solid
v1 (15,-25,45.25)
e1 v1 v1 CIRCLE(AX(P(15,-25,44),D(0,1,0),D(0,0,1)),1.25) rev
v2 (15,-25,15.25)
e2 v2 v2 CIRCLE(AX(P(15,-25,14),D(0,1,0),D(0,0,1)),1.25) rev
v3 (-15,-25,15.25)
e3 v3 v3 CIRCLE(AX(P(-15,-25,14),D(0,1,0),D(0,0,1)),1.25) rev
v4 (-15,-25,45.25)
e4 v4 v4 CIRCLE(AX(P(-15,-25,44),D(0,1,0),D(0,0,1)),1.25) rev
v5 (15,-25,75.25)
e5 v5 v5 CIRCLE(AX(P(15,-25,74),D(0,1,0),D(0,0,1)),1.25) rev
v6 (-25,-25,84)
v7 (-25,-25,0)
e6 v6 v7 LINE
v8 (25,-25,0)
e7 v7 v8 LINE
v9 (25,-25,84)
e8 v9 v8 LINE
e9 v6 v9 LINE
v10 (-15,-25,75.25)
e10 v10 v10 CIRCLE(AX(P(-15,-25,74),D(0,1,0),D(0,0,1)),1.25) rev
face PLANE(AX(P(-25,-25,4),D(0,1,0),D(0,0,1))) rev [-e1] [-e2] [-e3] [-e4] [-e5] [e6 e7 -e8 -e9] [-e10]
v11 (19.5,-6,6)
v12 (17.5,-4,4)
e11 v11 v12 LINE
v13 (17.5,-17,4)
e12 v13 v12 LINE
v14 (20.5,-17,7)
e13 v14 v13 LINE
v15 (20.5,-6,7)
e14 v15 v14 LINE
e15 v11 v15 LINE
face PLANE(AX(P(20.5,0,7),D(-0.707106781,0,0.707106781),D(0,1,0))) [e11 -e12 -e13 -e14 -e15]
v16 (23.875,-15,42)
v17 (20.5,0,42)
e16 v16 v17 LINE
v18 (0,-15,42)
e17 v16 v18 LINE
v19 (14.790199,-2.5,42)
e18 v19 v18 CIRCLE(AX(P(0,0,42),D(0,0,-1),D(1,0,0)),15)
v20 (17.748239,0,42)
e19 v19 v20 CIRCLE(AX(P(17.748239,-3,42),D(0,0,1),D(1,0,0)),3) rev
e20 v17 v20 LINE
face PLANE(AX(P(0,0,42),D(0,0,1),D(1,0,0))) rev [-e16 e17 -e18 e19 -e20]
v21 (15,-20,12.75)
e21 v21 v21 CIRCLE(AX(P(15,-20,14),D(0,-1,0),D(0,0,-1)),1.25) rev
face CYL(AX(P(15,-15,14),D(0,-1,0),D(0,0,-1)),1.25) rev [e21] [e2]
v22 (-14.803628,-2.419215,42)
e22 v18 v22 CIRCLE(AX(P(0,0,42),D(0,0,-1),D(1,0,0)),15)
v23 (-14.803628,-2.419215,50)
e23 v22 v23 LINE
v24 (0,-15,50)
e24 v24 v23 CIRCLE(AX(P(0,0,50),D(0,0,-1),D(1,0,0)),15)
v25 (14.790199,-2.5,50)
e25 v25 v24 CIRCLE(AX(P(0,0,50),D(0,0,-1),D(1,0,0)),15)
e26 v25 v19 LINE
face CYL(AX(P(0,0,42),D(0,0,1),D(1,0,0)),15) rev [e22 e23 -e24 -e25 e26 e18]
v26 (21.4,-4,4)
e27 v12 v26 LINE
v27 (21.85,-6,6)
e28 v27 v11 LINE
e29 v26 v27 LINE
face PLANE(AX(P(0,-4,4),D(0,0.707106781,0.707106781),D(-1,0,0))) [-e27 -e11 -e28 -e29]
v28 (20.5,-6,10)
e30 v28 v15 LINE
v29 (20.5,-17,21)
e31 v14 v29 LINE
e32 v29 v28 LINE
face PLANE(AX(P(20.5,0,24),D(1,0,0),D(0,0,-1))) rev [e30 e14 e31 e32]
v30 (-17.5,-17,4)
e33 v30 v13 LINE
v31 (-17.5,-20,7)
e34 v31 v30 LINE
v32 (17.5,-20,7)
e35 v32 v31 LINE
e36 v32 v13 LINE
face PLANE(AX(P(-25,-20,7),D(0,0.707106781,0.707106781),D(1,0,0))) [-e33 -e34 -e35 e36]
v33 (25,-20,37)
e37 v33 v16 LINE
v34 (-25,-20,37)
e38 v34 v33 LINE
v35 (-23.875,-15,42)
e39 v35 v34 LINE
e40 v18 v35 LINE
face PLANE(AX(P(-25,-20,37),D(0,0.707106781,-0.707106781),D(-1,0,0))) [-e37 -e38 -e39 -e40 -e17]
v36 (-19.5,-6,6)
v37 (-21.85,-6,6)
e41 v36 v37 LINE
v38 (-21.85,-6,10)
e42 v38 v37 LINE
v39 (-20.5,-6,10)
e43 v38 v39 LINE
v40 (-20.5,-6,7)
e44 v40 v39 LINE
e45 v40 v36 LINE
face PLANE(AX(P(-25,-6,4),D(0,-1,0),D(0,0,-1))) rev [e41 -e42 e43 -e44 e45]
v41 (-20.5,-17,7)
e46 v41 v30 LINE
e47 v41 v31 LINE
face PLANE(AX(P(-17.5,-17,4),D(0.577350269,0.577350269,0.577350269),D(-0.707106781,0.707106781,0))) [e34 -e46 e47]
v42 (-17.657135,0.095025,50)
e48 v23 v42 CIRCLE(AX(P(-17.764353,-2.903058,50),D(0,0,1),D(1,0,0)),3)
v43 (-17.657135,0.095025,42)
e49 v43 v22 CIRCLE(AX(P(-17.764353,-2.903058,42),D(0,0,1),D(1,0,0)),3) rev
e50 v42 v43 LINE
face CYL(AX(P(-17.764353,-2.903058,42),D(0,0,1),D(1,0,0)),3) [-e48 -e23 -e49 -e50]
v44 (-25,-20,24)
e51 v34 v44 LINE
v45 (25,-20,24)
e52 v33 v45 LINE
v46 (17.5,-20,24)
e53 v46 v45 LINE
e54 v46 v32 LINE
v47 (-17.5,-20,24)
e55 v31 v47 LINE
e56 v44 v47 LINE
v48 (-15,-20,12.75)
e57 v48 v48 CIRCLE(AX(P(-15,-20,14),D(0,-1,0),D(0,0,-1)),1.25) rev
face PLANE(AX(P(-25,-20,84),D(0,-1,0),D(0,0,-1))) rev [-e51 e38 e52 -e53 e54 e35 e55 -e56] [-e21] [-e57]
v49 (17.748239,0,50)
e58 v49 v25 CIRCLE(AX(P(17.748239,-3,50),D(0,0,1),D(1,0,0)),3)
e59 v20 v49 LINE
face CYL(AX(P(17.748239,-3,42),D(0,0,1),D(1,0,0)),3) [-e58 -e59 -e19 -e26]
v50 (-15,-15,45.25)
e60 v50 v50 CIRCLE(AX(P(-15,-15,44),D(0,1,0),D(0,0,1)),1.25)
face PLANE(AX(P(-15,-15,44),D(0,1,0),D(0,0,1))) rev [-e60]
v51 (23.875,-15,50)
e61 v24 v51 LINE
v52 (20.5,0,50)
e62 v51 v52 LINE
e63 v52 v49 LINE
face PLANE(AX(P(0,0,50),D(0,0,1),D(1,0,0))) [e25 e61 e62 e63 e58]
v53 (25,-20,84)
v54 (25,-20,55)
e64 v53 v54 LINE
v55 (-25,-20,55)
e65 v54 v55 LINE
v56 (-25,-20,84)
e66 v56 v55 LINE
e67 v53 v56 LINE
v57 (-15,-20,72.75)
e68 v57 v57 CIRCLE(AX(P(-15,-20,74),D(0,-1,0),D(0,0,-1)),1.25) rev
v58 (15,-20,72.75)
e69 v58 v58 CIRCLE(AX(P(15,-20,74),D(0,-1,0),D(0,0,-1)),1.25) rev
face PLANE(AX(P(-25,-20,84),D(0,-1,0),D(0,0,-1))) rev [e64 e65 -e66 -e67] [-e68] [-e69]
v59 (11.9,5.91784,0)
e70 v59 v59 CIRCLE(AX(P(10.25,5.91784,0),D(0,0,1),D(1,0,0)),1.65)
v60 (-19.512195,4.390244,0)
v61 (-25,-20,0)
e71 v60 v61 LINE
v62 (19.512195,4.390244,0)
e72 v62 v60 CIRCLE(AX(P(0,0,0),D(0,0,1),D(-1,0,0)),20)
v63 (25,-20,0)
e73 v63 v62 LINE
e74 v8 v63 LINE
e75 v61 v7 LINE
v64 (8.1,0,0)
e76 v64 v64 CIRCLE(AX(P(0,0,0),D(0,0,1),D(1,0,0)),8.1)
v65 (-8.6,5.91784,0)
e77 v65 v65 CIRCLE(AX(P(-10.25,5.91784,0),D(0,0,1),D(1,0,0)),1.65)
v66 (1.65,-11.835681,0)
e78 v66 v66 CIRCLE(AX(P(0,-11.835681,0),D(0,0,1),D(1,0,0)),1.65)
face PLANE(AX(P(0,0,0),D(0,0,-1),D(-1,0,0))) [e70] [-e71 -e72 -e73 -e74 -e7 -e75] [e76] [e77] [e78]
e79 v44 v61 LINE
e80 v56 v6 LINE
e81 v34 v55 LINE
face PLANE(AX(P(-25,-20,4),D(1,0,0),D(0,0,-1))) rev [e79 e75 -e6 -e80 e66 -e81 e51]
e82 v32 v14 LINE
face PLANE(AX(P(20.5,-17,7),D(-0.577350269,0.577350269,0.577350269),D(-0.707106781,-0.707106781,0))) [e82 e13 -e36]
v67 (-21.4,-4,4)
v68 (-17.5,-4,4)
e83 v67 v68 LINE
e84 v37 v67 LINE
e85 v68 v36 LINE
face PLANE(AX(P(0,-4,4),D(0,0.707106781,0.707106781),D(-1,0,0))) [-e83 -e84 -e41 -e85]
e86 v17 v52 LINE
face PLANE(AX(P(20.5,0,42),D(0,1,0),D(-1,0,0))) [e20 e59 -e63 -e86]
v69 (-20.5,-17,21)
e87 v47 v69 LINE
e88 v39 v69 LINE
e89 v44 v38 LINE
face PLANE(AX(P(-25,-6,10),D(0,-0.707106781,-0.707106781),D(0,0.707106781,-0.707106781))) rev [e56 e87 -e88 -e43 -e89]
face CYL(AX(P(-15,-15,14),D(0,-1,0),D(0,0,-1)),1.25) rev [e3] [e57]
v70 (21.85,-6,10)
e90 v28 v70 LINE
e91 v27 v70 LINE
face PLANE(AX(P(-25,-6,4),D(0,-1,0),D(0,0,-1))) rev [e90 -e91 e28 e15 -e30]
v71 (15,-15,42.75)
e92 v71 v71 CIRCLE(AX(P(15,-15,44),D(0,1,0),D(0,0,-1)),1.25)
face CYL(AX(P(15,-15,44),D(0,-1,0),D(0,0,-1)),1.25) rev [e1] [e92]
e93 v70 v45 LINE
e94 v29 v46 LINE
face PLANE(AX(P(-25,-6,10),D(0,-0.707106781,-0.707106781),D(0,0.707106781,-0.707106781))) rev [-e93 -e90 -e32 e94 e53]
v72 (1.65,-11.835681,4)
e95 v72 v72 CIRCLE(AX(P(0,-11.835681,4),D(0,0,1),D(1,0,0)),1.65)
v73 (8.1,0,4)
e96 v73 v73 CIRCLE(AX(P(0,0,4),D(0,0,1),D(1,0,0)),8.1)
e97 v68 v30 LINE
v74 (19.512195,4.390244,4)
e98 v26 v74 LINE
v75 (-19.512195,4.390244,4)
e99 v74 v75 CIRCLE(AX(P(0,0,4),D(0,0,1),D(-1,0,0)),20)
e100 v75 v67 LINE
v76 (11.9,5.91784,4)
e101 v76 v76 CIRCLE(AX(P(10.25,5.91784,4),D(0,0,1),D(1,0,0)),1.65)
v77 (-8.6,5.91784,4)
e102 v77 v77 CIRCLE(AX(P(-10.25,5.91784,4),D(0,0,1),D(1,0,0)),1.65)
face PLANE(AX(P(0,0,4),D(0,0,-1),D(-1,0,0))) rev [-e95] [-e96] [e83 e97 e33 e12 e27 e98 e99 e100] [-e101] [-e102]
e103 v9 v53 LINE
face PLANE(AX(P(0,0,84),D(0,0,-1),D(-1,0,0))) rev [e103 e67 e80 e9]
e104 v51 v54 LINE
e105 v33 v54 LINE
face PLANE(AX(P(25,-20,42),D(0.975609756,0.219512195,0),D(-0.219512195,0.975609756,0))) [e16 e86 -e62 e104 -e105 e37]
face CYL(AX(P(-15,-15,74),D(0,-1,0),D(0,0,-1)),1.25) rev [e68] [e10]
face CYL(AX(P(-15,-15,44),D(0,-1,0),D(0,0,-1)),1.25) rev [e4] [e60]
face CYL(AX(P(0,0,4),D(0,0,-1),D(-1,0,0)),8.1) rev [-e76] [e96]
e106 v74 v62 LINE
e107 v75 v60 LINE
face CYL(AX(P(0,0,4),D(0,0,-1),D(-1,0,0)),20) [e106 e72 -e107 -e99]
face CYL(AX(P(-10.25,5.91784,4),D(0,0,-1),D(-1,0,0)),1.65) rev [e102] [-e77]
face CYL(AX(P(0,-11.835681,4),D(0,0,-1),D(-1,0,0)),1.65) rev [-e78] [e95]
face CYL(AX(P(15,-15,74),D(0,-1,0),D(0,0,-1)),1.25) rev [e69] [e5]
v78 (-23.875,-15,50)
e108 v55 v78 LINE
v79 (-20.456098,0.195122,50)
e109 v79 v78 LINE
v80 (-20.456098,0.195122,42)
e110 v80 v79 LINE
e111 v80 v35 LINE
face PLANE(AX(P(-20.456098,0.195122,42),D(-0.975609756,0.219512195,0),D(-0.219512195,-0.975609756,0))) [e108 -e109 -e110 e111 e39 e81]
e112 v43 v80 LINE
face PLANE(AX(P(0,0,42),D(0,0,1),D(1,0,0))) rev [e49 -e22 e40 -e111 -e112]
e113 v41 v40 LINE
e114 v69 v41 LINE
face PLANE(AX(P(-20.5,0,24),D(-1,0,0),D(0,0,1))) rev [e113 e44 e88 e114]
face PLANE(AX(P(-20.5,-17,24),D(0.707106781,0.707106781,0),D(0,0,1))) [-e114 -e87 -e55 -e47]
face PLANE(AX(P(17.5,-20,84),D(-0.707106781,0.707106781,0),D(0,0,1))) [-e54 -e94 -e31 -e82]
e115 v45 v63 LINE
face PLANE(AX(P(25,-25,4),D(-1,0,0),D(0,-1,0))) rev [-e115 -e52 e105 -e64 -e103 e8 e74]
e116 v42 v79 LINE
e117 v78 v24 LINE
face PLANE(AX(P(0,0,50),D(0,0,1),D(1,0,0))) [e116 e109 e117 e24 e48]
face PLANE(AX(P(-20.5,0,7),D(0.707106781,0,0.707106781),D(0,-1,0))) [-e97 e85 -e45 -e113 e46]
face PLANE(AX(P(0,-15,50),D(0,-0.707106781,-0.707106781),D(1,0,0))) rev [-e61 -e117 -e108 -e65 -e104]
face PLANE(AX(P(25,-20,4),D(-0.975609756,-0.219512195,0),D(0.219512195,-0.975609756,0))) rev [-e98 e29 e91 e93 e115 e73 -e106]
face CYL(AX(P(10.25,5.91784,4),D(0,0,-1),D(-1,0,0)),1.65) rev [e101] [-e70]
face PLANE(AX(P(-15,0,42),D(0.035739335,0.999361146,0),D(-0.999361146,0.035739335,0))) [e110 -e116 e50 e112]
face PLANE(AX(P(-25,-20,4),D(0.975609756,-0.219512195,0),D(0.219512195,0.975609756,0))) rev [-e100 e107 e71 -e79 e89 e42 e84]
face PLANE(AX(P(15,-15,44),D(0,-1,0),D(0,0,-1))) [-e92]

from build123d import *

# Parameters (mm, degrees)
ESQUISSE1_R                  = 8.1
ESQUISSE1_R_2                = 1.65
BOSS_EXTRU_1_DEPTH           = 4
ESQUISSE2_W                  = 50
ESQUISSE2_H                  = 5
BOSS_EXTRU_2_DEPTH           = 80
BOSS_EXTRU_3_DEPTH           = 20
ENL_V_MAT_EXTRU_2_DEPTH      = 99.748417709
ENL_V_MAT_EXTRU_2_DEPTH_BACK = 99.748417709
CHANFREIN1_SIZE              = 3
CHANFREIN2_SIZE              = 2
BOSS_EXTRU_4_DEPTH           = 4
BOSS_EXTRU_4_DEPTH_BACK      = 4
CHANFREIN3_SIZE              = 5
ENL_V_MAT_EXTRU_3_DEPTH      = 5
ENL_V_MAT_EXTRU_3_DEPTH_BACK = 20
ESQUISSE6_R                  = 1.25
CONG_1_R                     = 3


with BuildPart() as part:
    # Esquisse1 → Boss.-Extru.1 (new body)
    with BuildSketch(Plane.XY):
        with BuildLine():
            Line((-25, -20), (-25, -25))
            Line((-25, -25), (25, -25))
            Line((25, -25), (25, -20))
            Line((25, -20), (19.512195122, 4.390243902))
            ThreePointArc((19.512195122, 4.390243902), (0, 20), (-19.512195122, 4.390243902))
            Line((-19.512195122, 4.390243902), (-25, -20))
        make_face()
        Circle(ESQUISSE1_R, mode=Mode.SUBTRACT)
        with Locations((-10.25, 5.917840259)):
            Circle(ESQUISSE1_R_2, mode=Mode.SUBTRACT)
        with Locations((10.25, 5.917840259)):
            Circle(ESQUISSE1_R_2, mode=Mode.SUBTRACT)
        with Locations((0, -11.835680518)):
            Circle(ESQUISSE1_R_2, mode=Mode.SUBTRACT)
    extrude(amount=BOSS_EXTRU_1_DEPTH)

    # Esquisse2 → Boss.-Extru.2 (add)
    with BuildSketch(Plane.XY.offset(4)):
        with Locations((0, -22.5)):
            Rectangle(ESQUISSE2_W, ESQUISSE2_H)
    extrude(amount=BOSS_EXTRU_2_DEPTH)

    # Esquisse4 → Boss.-Extru.3 (add)
    with BuildSketch(Plane.XY.offset(4)):
        Polygon((-20.5, 0), (-20.5, -20), (-25, -20), align=None)
        Polygon((20.5, -20), (25, -20), (20.5, 0), align=None)
    extrude(amount=BOSS_EXTRU_3_DEPTH)

    # Esquisse5 → Enlèv. mat.-Extru.2 (cut, two sides: drawn at the far end of the back side and taken through both)
    with BuildSketch(Plane(origin=(-20.5, 0, 0), x_dir=(0, 0, -1), z_dir=(1, 0, 0)).offset(-ENL_V_MAT_EXTRU_2_DEPTH_BACK)):
        Polygon((-4, 0), (-24, 0), (-24, -20), (-10, -6), (-4, -6), align=None)
    extrude(amount=ENL_V_MAT_EXTRU_2_DEPTH + ENL_V_MAT_EXTRU_2_DEPTH_BACK, mode=Mode.SUBTRACT)

    # Chanfrein1
    chanfrein1_edges = [part.edges().sort_by_distance(p)[0] for p in [
        (-20.5, -13, 4),
        (-20.5, -20, 14),
        (0, -20, 4),
        (20.5, -20, 14),
        (20.5, -13, 4),
    ]]
    chamfer(chanfrein1_edges, length=CHANFREIN1_SIZE)

    # Chanfrein2
    chanfrein2_edges = [part.edges().sort_by_distance(p)[0] for p in [
        (-19.675, -6, 4),
        (19.675, -6, 4),
    ]]
    chamfer(chanfrein2_edges, length=CHANFREIN2_SIZE)

    # Esquisse7 → Boss.-Extru.4 (add, two sides: drawn at the far end of the back side and taken through both)
    with BuildSketch(Plane.XY.offset(46).offset(-BOSS_EXTRU_4_DEPTH_BACK)):
        with BuildLine():
            Line((-15, 0), (-20.456097561, 0.195121951))
            Line((-20.456097561, 0.195121951), (-25, -20))
            Line((-25, -20), (25, -20))
            Line((25, -20), (20.5, 0))
            Line((20.5, 0), (15, 0))
            ThreePointArc((15, 0), (0, -15), (-15, 0))
        make_face()
    extrude(amount=BOSS_EXTRU_4_DEPTH + BOSS_EXTRU_4_DEPTH_BACK)

    # Chanfrein3
    # the kernel refuses this chamfer: 5 mm, written as the material it adds along each edge
    with BuildSketch(Plane(origin=(-25, -20, 42), x_dir=(0, -0.027495876610586317, -0.9996219169112968), z_dir=(1, 0, 0))) as chanfrein3_piece_1_section:
        Polygon((CHANFREIN3_SIZE * 0.999621916911, CHANFREIN3_SIZE * 0.0274958766106), (-CHANFREIN3_SIZE * 0.0274958766106, CHANFREIN3_SIZE * 0.999621916911), (0, 0), align=None)
    chanfrein3_piece_1 = extrude(amount=50, mode=Mode.PRIVATE)
    chanfrein3_piece_1 = split(chanfrein3_piece_1, bisect_by=Plane(origin=(23.445378938, -13.090573058, 40.343175913), z_dir=(-0.9756097560975611, -0.2195121951219509, 0)), keep=Keep.TOP, mode=Mode.PRIVATE)
    chanfrein3_piece_1 = split(chanfrein3_piece_1, bisect_by=Plane(origin=(-23.445378938, -13.090573058, 40.343175913), z_dir=(0.9756097560975611, -0.21951219512195103, 0)), keep=Keep.TOP, mode=Mode.PRIVATE)
    chanfrein3_piece_1 = chanfrein3_piece_1 - Plane(origin=(0, 0, 40.343175913), x_dir=(1, 0, 0), z_dir=(0, 0, -1)) * Cylinder(15, 120, mode=Mode.PRIVATE)
    add(chanfrein3_piece_1)
    with BuildSketch(Plane(origin=(-25, -20, 50), x_dir=(0, -0.027495876610586317, 0.9996219169112968), z_dir=(1, 0, 0))) as chanfrein3_piece_2_section:
        Polygon((CHANFREIN3_SIZE * 0.999621916911, -CHANFREIN3_SIZE * 0.0274958766106), (-CHANFREIN3_SIZE * 0.0274958766106, -CHANFREIN3_SIZE * 0.999621916911), (0, 0), align=None)
    chanfrein3_piece_2 = extrude(amount=50, mode=Mode.PRIVATE)
    chanfrein3_piece_2 = split(chanfrein3_piece_2, bisect_by=Plane(origin=(23.445378938, -13.090573058, 51.656824087), z_dir=(-0.9756097560975611, -0.2195121951219509, 0)), keep=Keep.TOP, mode=Mode.PRIVATE)
    chanfrein3_piece_2 = split(chanfrein3_piece_2, bisect_by=Plane(origin=(-23.445378938, -13.090573058, 51.656824087), z_dir=(0.9756097560975611, -0.21951219512195103, 0)), keep=Keep.TOP, mode=Mode.PRIVATE)
    chanfrein3_piece_2 = chanfrein3_piece_2 - Plane(origin=(0, 0, 51.656824087), x_dir=(1, 0, 0), z_dir=(0, 0, -1)) * Cylinder(15, 120, mode=Mode.PRIVATE)
    add(chanfrein3_piece_2)

    # Esquisse6 → Enlèv. mat.-Extru.3 (cut, two sides: drawn at the far end of the back side and taken through both)
    with BuildSketch(Plane(origin=(0, -20, 0), x_dir=(1, 0, 0), z_dir=(0, 1, 0)).offset(-ENL_V_MAT_EXTRU_3_DEPTH_BACK)):
        with Locations(Location((-15, -74, 0), (0, 0, 90))):
            Circle(ESQUISSE6_R)
        with Locations(Location((15, -74, 0), (0, 0, 90))):
            Circle(ESQUISSE6_R)
        with Locations(Location((15, -14, 0), (0, 0, 90))):
            Circle(ESQUISSE6_R)
        with Locations(Location((-15, -14, 0), (0, 0, 90))):
            Circle(ESQUISSE6_R)
        with Locations(Location((-15, -44, 0), (0, 0, 270))):
            Circle(ESQUISSE6_R)
        with Locations(Location((15, -44, 0), (0, 0, 90))):
            Circle(ESQUISSE6_R)
    extrude(amount=ENL_V_MAT_EXTRU_3_DEPTH + ENL_V_MAT_EXTRU_3_DEPTH_BACK, mode=Mode.SUBTRACT)

    # Congé1
    cong_1_edges = [part.edges().sort_by_distance(p)[0] for p in [
        (-15, 0, 46),
        (15, 0, 46),
    ]]
    fillet(cong_1_edges, radius=CONG_1_R)


solid = part.part
